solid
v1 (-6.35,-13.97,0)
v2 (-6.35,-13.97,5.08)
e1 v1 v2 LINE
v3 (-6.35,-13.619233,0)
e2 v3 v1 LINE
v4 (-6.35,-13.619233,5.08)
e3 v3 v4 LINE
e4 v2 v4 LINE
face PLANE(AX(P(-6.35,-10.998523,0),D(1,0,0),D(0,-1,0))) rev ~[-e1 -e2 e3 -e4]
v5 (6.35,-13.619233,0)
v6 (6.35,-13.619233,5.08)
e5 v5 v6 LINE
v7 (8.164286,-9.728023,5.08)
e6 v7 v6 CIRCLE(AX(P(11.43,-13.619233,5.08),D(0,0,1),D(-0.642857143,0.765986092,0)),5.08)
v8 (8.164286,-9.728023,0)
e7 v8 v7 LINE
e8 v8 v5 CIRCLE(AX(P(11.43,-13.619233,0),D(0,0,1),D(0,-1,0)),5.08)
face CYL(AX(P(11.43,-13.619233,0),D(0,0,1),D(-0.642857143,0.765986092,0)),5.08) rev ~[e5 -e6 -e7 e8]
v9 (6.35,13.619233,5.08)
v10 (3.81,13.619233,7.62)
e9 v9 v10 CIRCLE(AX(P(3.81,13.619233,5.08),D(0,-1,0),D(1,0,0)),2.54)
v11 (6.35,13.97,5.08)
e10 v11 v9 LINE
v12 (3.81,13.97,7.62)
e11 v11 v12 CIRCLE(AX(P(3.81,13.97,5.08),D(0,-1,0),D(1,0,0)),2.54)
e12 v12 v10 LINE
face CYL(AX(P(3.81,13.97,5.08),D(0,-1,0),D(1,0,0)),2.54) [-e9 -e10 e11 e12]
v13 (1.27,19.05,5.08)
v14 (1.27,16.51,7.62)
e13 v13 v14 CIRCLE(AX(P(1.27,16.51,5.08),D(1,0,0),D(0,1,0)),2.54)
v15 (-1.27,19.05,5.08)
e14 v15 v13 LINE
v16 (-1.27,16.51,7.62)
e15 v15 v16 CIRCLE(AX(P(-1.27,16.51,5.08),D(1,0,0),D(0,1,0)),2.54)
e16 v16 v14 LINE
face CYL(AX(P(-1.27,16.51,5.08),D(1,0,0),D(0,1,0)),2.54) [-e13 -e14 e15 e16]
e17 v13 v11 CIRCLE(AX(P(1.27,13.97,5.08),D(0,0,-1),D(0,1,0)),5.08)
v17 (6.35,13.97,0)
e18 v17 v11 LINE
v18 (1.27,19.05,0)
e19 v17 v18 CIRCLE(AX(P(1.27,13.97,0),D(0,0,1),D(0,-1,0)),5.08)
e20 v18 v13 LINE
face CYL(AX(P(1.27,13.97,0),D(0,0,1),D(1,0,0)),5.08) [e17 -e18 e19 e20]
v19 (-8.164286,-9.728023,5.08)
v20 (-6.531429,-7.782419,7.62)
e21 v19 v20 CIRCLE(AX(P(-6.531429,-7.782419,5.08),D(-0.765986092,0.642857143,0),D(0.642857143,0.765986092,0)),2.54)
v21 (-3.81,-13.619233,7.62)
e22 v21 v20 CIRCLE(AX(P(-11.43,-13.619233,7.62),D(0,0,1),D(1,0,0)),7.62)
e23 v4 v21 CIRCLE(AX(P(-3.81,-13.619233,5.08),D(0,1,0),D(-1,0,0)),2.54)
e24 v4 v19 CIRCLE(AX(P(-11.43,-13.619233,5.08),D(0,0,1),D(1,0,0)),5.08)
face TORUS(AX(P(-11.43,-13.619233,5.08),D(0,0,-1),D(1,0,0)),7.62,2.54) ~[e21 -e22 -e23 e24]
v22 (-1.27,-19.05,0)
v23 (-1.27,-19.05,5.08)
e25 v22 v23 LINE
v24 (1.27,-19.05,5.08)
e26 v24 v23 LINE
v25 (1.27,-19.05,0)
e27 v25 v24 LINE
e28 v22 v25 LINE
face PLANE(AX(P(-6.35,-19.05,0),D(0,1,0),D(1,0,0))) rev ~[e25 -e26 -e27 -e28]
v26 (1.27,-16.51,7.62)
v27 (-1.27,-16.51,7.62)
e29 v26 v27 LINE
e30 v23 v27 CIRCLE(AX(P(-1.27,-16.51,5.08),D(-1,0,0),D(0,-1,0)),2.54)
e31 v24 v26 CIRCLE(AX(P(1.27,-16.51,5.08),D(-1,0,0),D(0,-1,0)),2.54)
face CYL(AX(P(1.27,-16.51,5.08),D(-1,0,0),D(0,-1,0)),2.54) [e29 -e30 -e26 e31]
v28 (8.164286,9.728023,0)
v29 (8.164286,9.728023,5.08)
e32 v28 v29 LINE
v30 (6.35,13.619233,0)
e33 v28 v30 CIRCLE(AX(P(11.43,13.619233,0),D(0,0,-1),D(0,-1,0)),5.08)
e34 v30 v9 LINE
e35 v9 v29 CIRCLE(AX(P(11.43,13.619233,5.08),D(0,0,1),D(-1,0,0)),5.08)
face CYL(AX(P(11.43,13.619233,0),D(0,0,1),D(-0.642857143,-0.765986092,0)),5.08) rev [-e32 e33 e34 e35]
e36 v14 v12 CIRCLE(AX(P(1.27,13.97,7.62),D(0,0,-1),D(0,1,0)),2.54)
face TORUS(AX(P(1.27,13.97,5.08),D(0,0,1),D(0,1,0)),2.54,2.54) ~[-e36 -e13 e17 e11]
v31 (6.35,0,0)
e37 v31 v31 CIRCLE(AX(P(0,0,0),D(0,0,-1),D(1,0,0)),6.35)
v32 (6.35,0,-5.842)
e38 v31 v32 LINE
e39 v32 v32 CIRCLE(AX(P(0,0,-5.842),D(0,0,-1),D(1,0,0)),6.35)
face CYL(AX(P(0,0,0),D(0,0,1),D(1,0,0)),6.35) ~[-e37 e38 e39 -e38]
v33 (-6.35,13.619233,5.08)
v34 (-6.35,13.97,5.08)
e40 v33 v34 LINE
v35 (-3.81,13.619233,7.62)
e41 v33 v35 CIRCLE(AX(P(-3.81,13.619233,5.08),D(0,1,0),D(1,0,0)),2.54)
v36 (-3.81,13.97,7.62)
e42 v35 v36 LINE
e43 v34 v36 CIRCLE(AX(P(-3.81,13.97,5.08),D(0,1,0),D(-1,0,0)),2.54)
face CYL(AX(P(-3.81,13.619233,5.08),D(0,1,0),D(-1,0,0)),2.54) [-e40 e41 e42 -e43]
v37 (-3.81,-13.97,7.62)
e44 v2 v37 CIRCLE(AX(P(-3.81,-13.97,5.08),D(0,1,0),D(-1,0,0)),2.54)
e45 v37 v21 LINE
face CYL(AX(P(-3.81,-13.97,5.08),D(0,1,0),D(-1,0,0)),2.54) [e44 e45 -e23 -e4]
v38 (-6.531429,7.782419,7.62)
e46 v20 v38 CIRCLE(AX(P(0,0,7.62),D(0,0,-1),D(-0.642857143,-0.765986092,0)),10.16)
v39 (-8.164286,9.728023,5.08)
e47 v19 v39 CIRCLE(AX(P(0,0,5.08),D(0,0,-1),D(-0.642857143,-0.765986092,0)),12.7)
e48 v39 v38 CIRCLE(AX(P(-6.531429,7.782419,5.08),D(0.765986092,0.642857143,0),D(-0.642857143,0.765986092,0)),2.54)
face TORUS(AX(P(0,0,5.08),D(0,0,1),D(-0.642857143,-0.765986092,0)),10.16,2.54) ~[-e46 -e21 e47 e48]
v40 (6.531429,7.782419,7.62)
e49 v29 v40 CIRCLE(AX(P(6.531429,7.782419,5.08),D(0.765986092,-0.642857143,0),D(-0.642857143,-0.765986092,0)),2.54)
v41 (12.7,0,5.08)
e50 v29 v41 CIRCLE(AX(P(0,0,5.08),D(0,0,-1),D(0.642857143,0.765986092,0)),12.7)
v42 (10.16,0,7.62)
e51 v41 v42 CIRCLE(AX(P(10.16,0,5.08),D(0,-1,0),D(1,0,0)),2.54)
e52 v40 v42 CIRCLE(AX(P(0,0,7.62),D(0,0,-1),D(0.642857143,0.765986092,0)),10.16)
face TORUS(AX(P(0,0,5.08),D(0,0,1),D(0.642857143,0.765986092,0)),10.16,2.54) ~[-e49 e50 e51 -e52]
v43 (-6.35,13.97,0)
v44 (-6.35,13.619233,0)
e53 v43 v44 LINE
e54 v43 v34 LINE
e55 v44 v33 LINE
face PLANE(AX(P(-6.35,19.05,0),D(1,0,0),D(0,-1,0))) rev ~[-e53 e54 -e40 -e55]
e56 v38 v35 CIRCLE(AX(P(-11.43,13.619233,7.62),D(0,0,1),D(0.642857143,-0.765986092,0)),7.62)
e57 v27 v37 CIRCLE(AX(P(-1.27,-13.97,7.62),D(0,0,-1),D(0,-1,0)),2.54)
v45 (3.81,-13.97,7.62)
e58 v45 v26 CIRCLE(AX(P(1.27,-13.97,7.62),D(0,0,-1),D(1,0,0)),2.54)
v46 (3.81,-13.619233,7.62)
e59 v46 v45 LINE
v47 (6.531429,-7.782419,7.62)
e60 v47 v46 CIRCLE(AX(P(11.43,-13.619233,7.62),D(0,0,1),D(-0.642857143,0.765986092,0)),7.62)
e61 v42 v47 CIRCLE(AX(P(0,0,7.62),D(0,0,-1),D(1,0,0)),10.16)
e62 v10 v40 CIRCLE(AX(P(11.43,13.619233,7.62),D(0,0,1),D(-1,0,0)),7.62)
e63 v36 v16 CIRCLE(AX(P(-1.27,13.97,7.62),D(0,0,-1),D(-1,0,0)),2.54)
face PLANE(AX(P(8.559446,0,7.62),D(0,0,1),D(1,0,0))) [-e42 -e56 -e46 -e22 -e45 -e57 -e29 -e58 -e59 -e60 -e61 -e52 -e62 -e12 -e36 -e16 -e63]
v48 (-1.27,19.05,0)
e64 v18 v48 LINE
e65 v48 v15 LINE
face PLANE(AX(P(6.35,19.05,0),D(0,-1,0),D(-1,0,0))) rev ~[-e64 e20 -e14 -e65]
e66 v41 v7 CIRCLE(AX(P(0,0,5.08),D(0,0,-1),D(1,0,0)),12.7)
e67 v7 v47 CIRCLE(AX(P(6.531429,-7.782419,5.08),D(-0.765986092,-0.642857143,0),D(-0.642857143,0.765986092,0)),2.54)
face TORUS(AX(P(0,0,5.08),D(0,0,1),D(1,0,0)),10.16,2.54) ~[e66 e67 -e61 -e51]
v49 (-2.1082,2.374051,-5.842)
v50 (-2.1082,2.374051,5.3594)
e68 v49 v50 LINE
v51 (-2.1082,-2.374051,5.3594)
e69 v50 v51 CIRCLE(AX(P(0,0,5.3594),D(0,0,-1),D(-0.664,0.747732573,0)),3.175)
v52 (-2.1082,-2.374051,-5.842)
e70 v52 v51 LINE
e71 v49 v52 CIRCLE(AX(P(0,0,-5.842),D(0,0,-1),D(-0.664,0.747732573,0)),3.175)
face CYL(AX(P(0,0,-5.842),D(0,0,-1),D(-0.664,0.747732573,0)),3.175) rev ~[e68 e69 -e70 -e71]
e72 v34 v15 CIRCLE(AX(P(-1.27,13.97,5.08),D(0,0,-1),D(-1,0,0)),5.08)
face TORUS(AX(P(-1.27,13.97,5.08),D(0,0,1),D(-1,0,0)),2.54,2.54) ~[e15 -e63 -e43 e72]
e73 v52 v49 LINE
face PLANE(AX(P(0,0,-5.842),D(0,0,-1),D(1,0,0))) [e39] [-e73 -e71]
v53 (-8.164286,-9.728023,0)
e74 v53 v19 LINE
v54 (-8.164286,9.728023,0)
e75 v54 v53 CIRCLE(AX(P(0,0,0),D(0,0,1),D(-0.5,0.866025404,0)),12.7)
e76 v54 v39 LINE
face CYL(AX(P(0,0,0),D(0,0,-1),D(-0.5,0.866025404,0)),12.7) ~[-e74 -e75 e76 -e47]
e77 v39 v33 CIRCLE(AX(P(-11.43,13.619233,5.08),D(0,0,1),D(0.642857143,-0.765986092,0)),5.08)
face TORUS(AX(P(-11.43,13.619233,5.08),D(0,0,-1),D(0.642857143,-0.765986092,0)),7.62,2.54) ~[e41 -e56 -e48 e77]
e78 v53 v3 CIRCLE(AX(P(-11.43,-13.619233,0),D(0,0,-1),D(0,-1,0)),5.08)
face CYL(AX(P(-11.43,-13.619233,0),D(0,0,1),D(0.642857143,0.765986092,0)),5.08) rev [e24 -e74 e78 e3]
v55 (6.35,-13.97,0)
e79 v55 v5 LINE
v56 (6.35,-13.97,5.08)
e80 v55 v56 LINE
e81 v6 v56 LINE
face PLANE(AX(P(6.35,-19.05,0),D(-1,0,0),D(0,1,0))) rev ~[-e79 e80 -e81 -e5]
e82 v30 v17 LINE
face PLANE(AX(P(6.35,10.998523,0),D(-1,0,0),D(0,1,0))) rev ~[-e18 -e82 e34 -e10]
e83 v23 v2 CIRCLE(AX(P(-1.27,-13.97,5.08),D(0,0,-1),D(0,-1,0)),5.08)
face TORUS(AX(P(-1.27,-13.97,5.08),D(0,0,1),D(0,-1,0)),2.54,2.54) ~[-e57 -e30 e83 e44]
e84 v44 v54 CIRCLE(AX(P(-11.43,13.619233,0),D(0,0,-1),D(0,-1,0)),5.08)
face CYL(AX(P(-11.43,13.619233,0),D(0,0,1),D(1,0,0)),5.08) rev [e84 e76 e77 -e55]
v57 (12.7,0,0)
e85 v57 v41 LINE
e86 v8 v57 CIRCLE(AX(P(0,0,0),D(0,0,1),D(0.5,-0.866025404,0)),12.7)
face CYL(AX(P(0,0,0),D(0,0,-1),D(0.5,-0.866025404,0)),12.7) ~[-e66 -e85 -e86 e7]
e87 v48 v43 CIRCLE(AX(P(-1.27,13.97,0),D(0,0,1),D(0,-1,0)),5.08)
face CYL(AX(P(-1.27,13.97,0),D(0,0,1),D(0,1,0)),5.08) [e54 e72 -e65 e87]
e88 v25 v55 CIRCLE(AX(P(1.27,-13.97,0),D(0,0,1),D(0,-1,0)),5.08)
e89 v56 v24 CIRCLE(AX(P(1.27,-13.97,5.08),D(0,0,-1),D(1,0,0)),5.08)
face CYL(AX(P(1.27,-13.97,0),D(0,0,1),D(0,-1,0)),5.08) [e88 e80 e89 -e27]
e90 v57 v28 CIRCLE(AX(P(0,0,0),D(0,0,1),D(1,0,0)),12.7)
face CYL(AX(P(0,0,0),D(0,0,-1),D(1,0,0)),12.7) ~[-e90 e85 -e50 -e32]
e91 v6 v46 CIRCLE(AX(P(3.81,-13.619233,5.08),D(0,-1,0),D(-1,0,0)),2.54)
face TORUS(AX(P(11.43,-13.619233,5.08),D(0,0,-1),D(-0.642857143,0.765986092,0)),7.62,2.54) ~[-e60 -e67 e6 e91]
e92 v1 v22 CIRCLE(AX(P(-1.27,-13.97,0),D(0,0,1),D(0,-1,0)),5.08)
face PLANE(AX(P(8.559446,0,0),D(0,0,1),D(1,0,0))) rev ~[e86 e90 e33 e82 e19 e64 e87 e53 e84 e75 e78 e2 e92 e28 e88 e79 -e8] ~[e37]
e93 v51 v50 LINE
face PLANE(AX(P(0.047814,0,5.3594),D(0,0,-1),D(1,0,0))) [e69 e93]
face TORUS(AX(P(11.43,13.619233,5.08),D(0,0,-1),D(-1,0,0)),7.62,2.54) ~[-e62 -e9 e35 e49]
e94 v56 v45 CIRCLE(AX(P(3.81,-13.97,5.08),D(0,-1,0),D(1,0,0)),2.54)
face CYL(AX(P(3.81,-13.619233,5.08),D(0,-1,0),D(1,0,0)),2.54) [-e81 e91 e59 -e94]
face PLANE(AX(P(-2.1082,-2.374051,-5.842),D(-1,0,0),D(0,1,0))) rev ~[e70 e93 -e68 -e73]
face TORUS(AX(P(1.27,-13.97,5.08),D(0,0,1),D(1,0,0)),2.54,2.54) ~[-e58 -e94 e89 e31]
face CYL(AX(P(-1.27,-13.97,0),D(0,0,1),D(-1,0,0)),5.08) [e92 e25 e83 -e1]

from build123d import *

# Parameters (mm, degrees)
F1_DEPTH = 7.62
F2_R     = 5.08
F3_R     = 2.54
F4_R     = 6.35
F5_DEPTH = 5.842
F7_DEPTH = 11.2014


with BuildPart() as f1:
    # F0 (on Top) → F1 (new body)
    with BuildSketch(Plane.XY):
        with BuildLine():
            ThreePointArc((6.35, -10.9985226281), (10.9985226281, -6.35), (12.7, 0))
            ThreePointArc((12.7, 0), (10.9985226281, 6.35), (6.35, 10.9985226281))
            Line((6.35, 10.9985226281), (6.35, -10.9985226281))
        make_face()
        with BuildLine():
            Line((6.35, -10.9985226281), (6.35, 10.9985226281))
            ThreePointArc((6.35, 10.9985226281), (0, 12.7), (-6.35, 10.9985226281))
            Line((-6.35, 10.9985226281), (-6.35, -10.9985226281))
            ThreePointArc((-6.35, -10.9985226281), (0, -12.7), (6.35, -10.9985226281))
        make_face()
        with BuildLine():
            ThreePointArc((-6.35, 10.9985226281), (0, 12.7), (6.35, 10.9985226281))
            Line((6.35, 10.9985226281), (6.35, 19.05))
            Line((6.35, 19.05), (-6.35, 19.05))
            Line((-6.35, 19.05), (-6.35, 10.9985226281))
        make_face()
        with BuildLine():
            Line((6.35, -19.05), (6.35, -10.9985226281))
            ThreePointArc((6.35, -10.9985226281), (0, -12.7), (-6.35, -10.9985226281))
            Line((-6.35, -10.9985226281), (-6.35, -19.05))
            Line((-6.35, -19.05), (6.35, -19.05))
        make_face()
        with BuildLine():
            Line((-6.35, -10.9985226281), (-6.35, 10.9985226281))
            ThreePointArc((-6.35, 10.9985226281), (-12.7, 0), (-6.35, -10.9985226281))
        make_face()
    extrude(amount=F1_DEPTH)

    # F2
    f2_edges = [f1.edges().sort_by_distance(p)[0] for p in [
        (6.35, -10.998523, 3.81),
        (6.35, -19.05, 3.81),
        (-6.35, -19.05, 3.81),
        (-6.35, -10.998523, 3.81),
        (-6.35, 10.998523, 3.81),
        (-6.35, 19.05, 3.81),
        (6.35, 19.05, 3.81),
        (6.35, 10.998523, 3.81),
    ]]
    fillet(f2_edges, radius=F2_R)

    # F3
    f3_edges = [f1.edges().sort_by_distance(p)[0] for p in [
        (12.7, 0, 7.62),
        (6.825859, -11.472541, 7.62),
        (6.825859, 11.472541, 7.62),
        (6.35, -13.794616, 7.62),
        (6.35, 13.794616, 7.62),
        (4.862102, -17.562102, 7.62),
        (4.862102, 17.562102, 7.62),
        (0, -19.05, 7.62),
        (0, 19.05, 7.62),
        (-4.862102, -17.562102, 7.62),
        (-4.862102, 17.562102, 7.62),
        (-6.35, -13.794616, 7.62),
        (-6.35, 13.794616, 7.62),
        (-6.825859, -11.472541, 7.62),
        (-6.825859, 11.472541, 7.62),
        (-12.7, 0, 7.62),
    ]]
    fillet(f3_edges, radius=F3_R)

    # F4 (on face) → F5 (join)
    with BuildSketch(Plane(origin=(0, 0, 0), x_dir=(1, 0, 0), z_dir=(0, 0, -1))):
        Circle(F4_R)
    extrude(amount=F5_DEPTH)

    # F6 (on face) → F7 (cut)
    with BuildSketch(Plane(origin=(0, 0, -5.842), x_dir=(1, 0, 0), z_dir=(0, 0, -1))):
        with BuildLine():
            Line((-2.1082, 2.3740509177), (-2.1082, -2.3740509177))
            ThreePointArc((-2.1082, -2.3740509177), (3.175, 0), (-2.1082, 2.3740509177))
        make_face()
    extrude(amount=-F7_DEPTH, mode=Mode.SUBTRACT)


solid = f1.part
